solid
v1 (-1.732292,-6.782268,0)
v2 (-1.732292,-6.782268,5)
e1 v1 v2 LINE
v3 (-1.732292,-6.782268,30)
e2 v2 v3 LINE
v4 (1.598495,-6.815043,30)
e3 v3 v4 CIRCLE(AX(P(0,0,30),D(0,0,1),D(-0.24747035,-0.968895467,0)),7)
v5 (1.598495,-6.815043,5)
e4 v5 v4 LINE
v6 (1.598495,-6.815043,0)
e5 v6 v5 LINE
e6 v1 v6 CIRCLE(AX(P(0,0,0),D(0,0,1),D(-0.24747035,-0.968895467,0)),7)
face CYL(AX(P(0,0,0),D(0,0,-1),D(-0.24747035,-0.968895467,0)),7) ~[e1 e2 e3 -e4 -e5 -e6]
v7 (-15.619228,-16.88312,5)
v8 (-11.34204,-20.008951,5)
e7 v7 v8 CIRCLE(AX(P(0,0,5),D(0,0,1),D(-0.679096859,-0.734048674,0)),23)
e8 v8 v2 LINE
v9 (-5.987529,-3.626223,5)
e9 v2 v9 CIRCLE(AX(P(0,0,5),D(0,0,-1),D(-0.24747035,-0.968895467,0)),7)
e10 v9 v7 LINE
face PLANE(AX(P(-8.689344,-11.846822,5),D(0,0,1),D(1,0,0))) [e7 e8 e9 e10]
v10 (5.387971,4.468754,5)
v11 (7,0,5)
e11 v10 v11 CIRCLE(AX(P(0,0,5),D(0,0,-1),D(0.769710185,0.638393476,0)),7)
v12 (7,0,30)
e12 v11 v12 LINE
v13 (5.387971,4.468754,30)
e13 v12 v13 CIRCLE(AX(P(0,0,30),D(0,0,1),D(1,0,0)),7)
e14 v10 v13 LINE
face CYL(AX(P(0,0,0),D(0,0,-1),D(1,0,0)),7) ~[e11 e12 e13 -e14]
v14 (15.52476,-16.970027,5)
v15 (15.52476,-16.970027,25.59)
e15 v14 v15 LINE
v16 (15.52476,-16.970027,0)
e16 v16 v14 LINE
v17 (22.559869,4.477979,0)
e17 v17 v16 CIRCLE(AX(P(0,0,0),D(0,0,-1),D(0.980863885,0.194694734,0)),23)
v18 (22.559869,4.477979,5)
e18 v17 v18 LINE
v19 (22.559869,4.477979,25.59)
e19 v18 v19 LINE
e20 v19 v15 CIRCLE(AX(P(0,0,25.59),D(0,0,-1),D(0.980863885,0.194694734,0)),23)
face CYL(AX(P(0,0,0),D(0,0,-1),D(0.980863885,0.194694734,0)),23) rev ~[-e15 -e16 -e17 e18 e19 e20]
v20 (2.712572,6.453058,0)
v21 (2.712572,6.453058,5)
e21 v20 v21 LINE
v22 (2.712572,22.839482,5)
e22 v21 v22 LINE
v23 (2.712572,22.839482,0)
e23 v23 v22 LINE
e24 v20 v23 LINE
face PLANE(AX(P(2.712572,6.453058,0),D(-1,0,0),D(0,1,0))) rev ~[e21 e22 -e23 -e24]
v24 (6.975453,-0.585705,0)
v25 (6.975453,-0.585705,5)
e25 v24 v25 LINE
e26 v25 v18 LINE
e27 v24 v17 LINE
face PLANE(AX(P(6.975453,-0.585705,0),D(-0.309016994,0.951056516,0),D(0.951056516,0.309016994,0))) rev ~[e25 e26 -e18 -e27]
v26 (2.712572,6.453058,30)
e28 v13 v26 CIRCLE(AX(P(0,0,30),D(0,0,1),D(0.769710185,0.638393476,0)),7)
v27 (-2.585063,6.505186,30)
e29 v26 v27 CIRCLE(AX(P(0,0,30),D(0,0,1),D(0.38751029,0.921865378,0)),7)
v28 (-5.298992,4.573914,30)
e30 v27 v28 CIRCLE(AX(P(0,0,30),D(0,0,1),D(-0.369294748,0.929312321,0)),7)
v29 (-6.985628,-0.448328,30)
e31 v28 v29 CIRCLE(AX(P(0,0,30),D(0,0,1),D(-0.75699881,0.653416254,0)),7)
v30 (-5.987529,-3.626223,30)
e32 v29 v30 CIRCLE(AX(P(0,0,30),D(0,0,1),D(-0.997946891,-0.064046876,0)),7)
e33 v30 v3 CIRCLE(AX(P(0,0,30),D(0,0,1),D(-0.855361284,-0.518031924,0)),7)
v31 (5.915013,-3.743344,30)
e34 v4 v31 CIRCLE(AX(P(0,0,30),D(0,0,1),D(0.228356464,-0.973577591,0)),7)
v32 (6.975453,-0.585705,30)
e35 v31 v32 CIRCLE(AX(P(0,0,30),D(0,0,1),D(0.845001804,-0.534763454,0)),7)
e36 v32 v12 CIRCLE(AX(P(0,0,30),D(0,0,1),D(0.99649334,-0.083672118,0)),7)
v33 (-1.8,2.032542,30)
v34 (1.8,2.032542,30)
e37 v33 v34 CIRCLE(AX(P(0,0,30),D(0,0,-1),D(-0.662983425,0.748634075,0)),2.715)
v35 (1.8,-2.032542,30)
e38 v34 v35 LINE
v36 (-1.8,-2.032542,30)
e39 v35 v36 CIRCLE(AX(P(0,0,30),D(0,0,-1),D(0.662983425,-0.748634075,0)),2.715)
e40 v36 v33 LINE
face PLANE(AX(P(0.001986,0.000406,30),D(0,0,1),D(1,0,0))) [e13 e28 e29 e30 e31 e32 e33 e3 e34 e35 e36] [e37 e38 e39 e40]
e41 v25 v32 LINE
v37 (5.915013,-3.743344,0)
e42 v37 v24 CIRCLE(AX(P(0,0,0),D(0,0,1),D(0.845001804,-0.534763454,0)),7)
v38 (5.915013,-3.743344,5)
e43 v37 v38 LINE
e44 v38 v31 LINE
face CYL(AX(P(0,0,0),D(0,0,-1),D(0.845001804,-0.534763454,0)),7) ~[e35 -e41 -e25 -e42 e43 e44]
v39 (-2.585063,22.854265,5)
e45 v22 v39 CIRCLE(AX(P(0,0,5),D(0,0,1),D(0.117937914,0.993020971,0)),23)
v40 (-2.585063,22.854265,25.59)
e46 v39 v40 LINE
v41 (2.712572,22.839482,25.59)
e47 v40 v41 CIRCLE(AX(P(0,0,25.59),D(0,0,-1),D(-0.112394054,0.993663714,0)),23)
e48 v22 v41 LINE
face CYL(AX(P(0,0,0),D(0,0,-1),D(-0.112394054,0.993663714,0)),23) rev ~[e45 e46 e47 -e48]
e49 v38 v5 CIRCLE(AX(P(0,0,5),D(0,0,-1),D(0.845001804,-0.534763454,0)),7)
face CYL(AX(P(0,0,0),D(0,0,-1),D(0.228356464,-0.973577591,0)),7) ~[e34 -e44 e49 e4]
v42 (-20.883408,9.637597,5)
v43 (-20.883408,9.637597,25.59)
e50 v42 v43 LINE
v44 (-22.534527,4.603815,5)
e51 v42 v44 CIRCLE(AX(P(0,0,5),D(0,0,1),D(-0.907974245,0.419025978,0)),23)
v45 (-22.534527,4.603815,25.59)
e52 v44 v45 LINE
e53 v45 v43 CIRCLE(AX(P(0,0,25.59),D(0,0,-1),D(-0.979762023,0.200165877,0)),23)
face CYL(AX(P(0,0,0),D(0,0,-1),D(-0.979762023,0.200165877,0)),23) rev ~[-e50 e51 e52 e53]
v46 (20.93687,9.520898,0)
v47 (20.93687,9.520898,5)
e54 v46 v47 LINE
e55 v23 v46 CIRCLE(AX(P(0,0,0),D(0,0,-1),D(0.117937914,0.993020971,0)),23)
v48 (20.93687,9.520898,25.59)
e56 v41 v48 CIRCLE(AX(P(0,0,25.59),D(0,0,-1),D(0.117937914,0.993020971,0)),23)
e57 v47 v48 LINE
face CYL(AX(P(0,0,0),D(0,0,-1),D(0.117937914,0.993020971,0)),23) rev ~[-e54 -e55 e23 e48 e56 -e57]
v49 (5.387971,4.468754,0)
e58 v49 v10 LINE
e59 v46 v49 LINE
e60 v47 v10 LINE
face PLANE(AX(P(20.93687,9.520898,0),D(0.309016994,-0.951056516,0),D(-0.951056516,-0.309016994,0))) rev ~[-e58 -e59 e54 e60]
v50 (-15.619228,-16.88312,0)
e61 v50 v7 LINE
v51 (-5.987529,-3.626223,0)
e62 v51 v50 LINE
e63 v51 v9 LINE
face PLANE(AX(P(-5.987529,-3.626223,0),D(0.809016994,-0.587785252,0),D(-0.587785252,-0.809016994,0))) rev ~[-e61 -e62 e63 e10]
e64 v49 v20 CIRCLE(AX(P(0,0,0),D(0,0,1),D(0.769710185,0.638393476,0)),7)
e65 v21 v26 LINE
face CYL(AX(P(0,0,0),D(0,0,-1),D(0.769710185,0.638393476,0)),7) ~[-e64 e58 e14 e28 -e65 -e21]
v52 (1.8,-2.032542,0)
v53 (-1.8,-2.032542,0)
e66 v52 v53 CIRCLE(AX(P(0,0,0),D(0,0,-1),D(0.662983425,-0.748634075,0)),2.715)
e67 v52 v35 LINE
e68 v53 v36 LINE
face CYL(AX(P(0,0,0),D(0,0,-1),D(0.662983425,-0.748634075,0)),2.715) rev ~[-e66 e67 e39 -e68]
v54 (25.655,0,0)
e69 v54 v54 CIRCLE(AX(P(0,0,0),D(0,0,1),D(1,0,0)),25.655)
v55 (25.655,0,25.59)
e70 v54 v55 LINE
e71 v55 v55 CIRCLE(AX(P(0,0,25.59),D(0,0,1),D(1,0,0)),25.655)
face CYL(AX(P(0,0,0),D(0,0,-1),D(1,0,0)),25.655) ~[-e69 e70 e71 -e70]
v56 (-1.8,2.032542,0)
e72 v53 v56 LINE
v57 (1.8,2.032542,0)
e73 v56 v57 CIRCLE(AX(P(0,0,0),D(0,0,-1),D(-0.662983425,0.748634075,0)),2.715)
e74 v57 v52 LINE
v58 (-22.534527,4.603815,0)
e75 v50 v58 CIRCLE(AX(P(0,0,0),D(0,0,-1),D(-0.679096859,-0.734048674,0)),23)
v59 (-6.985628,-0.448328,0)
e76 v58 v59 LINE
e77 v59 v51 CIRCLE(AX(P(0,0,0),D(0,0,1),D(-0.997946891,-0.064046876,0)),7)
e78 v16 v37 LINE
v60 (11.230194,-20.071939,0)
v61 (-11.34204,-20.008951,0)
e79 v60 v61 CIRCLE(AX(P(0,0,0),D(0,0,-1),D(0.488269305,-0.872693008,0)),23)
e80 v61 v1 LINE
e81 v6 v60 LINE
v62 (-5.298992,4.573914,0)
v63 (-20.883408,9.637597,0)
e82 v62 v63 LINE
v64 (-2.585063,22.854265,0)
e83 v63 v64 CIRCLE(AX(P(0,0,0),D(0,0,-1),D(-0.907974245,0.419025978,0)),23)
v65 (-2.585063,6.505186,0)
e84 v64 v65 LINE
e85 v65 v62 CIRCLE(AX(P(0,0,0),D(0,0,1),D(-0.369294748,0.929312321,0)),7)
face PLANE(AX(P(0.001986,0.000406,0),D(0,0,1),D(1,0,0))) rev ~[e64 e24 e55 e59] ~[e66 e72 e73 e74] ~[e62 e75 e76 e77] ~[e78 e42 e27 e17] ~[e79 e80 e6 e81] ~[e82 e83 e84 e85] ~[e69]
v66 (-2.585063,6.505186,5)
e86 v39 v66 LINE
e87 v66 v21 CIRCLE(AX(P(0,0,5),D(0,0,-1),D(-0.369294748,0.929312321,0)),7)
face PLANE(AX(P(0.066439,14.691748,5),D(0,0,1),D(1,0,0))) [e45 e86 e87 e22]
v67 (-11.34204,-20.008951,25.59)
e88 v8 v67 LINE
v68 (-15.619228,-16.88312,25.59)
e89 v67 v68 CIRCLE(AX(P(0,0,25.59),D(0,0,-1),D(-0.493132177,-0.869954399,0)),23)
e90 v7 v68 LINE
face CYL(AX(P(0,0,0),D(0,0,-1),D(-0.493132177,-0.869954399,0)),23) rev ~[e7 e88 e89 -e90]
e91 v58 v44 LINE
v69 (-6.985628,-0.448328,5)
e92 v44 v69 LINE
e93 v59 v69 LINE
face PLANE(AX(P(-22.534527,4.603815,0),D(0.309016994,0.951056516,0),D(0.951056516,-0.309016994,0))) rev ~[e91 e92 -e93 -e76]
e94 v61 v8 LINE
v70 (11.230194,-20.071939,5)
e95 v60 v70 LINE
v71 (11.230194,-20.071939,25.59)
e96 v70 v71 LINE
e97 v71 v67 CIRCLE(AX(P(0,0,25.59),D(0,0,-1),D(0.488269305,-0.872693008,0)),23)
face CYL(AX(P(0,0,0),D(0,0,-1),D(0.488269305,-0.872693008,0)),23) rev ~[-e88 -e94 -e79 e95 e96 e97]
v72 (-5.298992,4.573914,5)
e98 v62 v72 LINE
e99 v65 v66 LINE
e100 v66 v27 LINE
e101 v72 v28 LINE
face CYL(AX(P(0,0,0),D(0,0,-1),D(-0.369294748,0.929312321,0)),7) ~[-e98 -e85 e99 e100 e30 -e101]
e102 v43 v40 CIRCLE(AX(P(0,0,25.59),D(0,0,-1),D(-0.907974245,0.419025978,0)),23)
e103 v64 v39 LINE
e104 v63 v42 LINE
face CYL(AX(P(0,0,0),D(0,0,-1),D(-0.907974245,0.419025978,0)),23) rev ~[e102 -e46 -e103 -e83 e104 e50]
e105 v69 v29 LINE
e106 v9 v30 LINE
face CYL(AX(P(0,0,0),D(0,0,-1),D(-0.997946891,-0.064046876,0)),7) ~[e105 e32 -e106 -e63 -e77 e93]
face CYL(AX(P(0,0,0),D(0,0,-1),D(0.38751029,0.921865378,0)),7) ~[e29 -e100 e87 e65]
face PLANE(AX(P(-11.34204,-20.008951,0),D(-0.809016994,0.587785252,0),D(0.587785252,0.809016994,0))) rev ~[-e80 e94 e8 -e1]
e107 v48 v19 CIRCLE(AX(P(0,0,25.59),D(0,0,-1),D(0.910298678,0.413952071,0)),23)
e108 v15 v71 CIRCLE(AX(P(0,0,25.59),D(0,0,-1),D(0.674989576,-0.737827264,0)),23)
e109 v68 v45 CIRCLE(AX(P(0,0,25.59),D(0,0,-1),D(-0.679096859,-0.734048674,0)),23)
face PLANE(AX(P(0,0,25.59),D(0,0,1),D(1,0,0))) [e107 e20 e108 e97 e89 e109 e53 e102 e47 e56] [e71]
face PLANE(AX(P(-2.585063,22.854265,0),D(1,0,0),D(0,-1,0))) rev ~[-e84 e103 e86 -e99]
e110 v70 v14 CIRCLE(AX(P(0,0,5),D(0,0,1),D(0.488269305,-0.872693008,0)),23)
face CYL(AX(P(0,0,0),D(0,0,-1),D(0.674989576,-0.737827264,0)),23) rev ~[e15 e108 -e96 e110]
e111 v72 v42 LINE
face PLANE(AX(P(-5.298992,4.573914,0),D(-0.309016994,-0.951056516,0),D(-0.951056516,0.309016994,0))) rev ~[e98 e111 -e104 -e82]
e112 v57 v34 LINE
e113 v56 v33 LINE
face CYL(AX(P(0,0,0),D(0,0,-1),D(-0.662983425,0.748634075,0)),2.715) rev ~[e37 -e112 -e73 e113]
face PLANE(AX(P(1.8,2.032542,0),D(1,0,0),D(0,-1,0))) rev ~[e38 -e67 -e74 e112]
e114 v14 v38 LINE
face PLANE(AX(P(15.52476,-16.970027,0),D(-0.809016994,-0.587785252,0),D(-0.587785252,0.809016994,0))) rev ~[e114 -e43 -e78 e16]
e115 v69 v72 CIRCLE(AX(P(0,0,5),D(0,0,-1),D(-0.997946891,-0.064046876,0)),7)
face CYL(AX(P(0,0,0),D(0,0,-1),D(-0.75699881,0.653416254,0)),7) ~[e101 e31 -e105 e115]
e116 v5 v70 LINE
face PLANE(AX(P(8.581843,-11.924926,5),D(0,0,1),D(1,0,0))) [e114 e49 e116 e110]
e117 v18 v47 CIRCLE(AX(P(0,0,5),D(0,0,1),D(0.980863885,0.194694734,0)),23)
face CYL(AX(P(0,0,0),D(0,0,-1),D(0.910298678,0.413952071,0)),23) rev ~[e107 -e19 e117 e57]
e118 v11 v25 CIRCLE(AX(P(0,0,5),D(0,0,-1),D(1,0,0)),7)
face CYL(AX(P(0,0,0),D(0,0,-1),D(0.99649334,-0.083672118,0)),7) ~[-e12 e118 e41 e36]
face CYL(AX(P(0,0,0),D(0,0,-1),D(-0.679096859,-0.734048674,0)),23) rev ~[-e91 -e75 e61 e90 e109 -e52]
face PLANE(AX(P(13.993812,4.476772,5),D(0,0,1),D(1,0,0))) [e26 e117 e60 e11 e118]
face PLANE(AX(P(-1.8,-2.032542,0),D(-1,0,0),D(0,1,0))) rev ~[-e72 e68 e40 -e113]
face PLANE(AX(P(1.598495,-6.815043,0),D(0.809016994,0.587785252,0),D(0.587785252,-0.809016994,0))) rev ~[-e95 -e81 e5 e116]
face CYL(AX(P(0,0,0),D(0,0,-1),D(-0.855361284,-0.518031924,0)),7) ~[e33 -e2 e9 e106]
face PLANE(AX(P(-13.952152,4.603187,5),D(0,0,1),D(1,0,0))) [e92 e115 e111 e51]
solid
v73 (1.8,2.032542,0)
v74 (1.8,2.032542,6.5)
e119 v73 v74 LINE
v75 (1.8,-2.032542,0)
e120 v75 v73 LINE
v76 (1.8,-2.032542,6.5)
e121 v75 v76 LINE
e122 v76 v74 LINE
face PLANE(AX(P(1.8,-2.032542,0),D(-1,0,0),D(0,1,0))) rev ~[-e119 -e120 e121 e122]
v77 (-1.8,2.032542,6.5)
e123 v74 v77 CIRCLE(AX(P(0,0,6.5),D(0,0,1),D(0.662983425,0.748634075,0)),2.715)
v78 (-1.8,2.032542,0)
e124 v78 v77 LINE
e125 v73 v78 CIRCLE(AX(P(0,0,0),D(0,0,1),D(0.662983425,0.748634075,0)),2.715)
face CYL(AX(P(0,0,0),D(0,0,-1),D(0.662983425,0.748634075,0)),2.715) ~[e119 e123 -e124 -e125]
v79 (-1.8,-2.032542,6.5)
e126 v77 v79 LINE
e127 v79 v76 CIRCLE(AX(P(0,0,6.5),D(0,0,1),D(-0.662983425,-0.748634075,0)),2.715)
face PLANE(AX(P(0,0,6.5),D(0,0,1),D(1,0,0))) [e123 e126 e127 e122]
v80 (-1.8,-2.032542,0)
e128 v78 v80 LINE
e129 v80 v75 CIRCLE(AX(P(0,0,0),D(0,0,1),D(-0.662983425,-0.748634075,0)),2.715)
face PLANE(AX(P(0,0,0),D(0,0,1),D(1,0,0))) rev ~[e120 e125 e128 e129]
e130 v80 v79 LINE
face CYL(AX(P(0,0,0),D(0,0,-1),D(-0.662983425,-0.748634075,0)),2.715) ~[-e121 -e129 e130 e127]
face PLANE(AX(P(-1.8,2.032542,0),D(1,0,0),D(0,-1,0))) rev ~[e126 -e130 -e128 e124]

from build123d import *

# Parameters (mm, degrees)
F1_DEPTH = 6.5
F0_R     = 25.655
F2_DEPTH = 25.59
F3_DEPTH = 5
F4_DEPTH = 30


# Not quite as in the source:
# - a feature names something its author has since deleted; it is built from what else it names


with BuildPart() as f1:
    # F0 (on Top) → F1 (new body)
    with BuildSketch(Plane.XY):
        with BuildLine():
            Line((-1.8, 2.0325415125), (-1.8, -2.0325415125))
            ThreePointArc((-1.8, -2.0325415125), (0, -2.715), (1.8, -2.0325415125))
            Line((1.8, -2.0325415125), (1.8, 2.0325415125))
            ThreePointArc((1.8, 2.0325415125), (0, 2.715), (-1.8, 2.0325415125))
        make_face()
    extrude(amount=F1_DEPTH)


with BuildPart() as f2:
    # F0 (on Top) → F2 (new body)
    with BuildSketch(Plane.XY):
        Circle(F0_R)
        with BuildLine():
            ThreePointArc((2.712572027, 22.8394823277), (13.5709320481, 18.5695935159), (20.9368695862, 9.5208976432))
            ThreePointArc((20.9368695862, 9.5208976432), (21.8940478661, 7.0463230153), (22.5598693514, 4.4779788798))
            ThreePointArc((22.5598693514, 4.4779788798), (22.8897028714, 2.2497783133), (23, 0))
            ThreePointArc((23, 0), (21.0483905071, -9.2717450925), (15.5247602556, -16.9700270773))
            ThreePointArc((15.5247602556, -16.9700270773), (13.4670842859, -18.6450433316), (11.2301940139, -20.0719391791))
            ThreePointArc((11.2301940139, -20.0719391791), (-0.0641814467, -22.9999104507), (-11.342040081, -20.0089511669))
            ThreePointArc((-11.342040081, -20.0089511669), (-13.5709320481, -18.5695935159), (-15.6192277505, -16.8831195126))
            ThreePointArc((-15.6192277505, -16.8831195126), (-21.8940478661, -7.0463230153), (-22.5345265275, 4.6038151769))
            ThreePointArc((-22.5345265275, 4.6038151769), (-21.8543815506, 7.1684033815), (-20.8834076418, 9.6375974842))
            ThreePointArc((-20.8834076418, 9.6375974842), (-13.4670842859, 18.6450433316), (-2.5850632334, 22.8542654242))
            ThreePointArc((-2.5850632334, 22.8542654242), (0.0641814467, 22.9999104507), (2.712572027, 22.8394823277))
        make_face(mode=Mode.SUBTRACT)
    extrude(amount=F2_DEPTH)

    # F0 (on Top) → F3 (join)
    with BuildSketch(Plane.XY):
        with BuildLine():
            ThreePointArc((-2.5850632334, 6.5051862448), (0.0688764893, 6.9996611367), (2.712572027, 6.4530576472))
            Line((2.712572027, 6.4530576472), (2.712572027, 22.8394823277))
            ThreePointArc((2.712572027, 22.8394823277), (0.0641814467, 22.9999104507), (-2.5850632334, 22.8542654242))
            Line((-2.5850632334, 22.8542654242), (-2.5850632334, 6.5051862448))
        make_face()
        with BuildLine():
            ThreePointArc((-6.9856282385, -0.4483281319), (-6.6357893302, 2.2285196801), (-5.2989916706, 4.5739137808))
            Line((-5.2989916706, 4.5739137808), (-20.8834076418, 9.6375974842))
            ThreePointArc((-20.8834076418, 9.6375974842), (-21.8543815506, 7.1684033815), (-22.5345265275, 4.6038151769))
            Line((-22.5345265275, 4.6038151769), (-6.9856282385, -0.4483281319))
        make_face()
        with BuildLine():
            Line((-11.342040081, -20.0089511669), (-1.7322924508, -6.7822682684))
            ThreePointArc((-1.7322924508, -6.7822682684), (-4.1700198376, -5.6223602298), (-5.9875289855, -3.6262234691))
            Line((-5.9875289855, -3.6262234691), (-15.6192277505, -16.8831195126))
            ThreePointArc((-15.6192277505, -16.8831195126), (-13.5709320481, -18.5695935159), (-11.342040081, -20.0089511669))
        make_face()
        with BuildLine():
            Line((15.5247602556, -16.9700270773), (5.9150126254, -3.7433441788))
            ThreePointArc((5.9150126254, -3.7433441788), (4.0585753368, -5.7033293992), (1.5984952489, -6.8150431355))
            Line((1.5984952489, -6.8150431355), (11.2301940139, -20.0719391791))
            ThreePointArc((11.2301940139, -20.0719391791), (13.4670842859, -18.6450433316), (15.5247602556, -16.9700270773))
        make_face()
        with BuildLine():
            ThreePointArc((5.3879712972, 4.4687543343), (6.584671559, 2.3753106028), (7, 0))
            ThreePointArc((7, 0), (6.9938606528, -0.2931094833), (6.9754533802, -0.5857048235))
            Line((6.9754533802, -0.5857048235), (22.5598693514, 4.4779788798))
            ThreePointArc((22.5598693514, 4.4779788798), (21.8940478661, 7.0463230153), (20.9368695862, 9.5208976432))
            Line((20.9368695862, 9.5208976432), (5.3879712972, 4.4687543343))
        make_face()
    extrude(amount=F3_DEPTH)

    # F0 (on Top) → F4 (join)
    with BuildSketch(Plane.XY):
        with BuildLine():
            ThreePointArc((6.9754533802, -0.5857048235), (6.9938606528, -0.2931094833), (7, 0))
            ThreePointArc((7, 0), (6.584671559, 2.3753106028), (5.3879712972, 4.4687543343))
            ThreePointArc((5.3879712972, 4.4687543343), (4.1700198376, 5.6223602298), (2.712572027, 6.4530576472))
            ThreePointArc((2.712572027, 6.4530576472), (0.0688764893, 6.9996611367), (-2.5850632334, 6.5051862448))
            ThreePointArc((-2.5850632334, 6.5051862448), (-4.0585753368, 5.7033293992), (-5.2989916706, 4.5739137808))
            ThreePointArc((-5.2989916706, 4.5739137808), (-6.6357893302, 2.2285196801), (-6.9856282385, -0.4483281319))
            ThreePointArc((-6.9856282385, -0.4483281319), (-6.6783573417, -2.0975088121), (-5.9875289855, -3.6262234691))
            ThreePointArc((-5.9875289855, -3.6262234691), (-4.1700198376, -5.6223602298), (-1.7322924508, -6.7822682684))
            ThreePointArc((-1.7322924508, -6.7822682684), (-0.0688764893, -6.9996611367), (1.5984952489, -6.8150431355))
            ThreePointArc((1.5984952489, -6.8150431355), (4.0585753368, -5.7033293992), (5.9150126254, -3.7433441788))
            ThreePointArc((5.9150126254, -3.7433441788), (6.6357893302, -2.2285196801), (6.9754533802, -0.5857048235))
        make_face()
        with BuildLine():
            ThreePointArc((1.8, -2.0325415125), (0, -2.715), (-1.8, -2.0325415125))
            Line((-1.8, -2.0325415125), (-1.8, 2.0325415125))
            ThreePointArc((-1.8, 2.0325415125), (0, 2.715), (1.8, 2.0325415125))
            Line((1.8, 2.0325415125), (1.8, -2.0325415125))
        make_face(mode=Mode.SUBTRACT)
    extrude(amount=F4_DEPTH)


solid = Compound([f1.part, f2.part])
